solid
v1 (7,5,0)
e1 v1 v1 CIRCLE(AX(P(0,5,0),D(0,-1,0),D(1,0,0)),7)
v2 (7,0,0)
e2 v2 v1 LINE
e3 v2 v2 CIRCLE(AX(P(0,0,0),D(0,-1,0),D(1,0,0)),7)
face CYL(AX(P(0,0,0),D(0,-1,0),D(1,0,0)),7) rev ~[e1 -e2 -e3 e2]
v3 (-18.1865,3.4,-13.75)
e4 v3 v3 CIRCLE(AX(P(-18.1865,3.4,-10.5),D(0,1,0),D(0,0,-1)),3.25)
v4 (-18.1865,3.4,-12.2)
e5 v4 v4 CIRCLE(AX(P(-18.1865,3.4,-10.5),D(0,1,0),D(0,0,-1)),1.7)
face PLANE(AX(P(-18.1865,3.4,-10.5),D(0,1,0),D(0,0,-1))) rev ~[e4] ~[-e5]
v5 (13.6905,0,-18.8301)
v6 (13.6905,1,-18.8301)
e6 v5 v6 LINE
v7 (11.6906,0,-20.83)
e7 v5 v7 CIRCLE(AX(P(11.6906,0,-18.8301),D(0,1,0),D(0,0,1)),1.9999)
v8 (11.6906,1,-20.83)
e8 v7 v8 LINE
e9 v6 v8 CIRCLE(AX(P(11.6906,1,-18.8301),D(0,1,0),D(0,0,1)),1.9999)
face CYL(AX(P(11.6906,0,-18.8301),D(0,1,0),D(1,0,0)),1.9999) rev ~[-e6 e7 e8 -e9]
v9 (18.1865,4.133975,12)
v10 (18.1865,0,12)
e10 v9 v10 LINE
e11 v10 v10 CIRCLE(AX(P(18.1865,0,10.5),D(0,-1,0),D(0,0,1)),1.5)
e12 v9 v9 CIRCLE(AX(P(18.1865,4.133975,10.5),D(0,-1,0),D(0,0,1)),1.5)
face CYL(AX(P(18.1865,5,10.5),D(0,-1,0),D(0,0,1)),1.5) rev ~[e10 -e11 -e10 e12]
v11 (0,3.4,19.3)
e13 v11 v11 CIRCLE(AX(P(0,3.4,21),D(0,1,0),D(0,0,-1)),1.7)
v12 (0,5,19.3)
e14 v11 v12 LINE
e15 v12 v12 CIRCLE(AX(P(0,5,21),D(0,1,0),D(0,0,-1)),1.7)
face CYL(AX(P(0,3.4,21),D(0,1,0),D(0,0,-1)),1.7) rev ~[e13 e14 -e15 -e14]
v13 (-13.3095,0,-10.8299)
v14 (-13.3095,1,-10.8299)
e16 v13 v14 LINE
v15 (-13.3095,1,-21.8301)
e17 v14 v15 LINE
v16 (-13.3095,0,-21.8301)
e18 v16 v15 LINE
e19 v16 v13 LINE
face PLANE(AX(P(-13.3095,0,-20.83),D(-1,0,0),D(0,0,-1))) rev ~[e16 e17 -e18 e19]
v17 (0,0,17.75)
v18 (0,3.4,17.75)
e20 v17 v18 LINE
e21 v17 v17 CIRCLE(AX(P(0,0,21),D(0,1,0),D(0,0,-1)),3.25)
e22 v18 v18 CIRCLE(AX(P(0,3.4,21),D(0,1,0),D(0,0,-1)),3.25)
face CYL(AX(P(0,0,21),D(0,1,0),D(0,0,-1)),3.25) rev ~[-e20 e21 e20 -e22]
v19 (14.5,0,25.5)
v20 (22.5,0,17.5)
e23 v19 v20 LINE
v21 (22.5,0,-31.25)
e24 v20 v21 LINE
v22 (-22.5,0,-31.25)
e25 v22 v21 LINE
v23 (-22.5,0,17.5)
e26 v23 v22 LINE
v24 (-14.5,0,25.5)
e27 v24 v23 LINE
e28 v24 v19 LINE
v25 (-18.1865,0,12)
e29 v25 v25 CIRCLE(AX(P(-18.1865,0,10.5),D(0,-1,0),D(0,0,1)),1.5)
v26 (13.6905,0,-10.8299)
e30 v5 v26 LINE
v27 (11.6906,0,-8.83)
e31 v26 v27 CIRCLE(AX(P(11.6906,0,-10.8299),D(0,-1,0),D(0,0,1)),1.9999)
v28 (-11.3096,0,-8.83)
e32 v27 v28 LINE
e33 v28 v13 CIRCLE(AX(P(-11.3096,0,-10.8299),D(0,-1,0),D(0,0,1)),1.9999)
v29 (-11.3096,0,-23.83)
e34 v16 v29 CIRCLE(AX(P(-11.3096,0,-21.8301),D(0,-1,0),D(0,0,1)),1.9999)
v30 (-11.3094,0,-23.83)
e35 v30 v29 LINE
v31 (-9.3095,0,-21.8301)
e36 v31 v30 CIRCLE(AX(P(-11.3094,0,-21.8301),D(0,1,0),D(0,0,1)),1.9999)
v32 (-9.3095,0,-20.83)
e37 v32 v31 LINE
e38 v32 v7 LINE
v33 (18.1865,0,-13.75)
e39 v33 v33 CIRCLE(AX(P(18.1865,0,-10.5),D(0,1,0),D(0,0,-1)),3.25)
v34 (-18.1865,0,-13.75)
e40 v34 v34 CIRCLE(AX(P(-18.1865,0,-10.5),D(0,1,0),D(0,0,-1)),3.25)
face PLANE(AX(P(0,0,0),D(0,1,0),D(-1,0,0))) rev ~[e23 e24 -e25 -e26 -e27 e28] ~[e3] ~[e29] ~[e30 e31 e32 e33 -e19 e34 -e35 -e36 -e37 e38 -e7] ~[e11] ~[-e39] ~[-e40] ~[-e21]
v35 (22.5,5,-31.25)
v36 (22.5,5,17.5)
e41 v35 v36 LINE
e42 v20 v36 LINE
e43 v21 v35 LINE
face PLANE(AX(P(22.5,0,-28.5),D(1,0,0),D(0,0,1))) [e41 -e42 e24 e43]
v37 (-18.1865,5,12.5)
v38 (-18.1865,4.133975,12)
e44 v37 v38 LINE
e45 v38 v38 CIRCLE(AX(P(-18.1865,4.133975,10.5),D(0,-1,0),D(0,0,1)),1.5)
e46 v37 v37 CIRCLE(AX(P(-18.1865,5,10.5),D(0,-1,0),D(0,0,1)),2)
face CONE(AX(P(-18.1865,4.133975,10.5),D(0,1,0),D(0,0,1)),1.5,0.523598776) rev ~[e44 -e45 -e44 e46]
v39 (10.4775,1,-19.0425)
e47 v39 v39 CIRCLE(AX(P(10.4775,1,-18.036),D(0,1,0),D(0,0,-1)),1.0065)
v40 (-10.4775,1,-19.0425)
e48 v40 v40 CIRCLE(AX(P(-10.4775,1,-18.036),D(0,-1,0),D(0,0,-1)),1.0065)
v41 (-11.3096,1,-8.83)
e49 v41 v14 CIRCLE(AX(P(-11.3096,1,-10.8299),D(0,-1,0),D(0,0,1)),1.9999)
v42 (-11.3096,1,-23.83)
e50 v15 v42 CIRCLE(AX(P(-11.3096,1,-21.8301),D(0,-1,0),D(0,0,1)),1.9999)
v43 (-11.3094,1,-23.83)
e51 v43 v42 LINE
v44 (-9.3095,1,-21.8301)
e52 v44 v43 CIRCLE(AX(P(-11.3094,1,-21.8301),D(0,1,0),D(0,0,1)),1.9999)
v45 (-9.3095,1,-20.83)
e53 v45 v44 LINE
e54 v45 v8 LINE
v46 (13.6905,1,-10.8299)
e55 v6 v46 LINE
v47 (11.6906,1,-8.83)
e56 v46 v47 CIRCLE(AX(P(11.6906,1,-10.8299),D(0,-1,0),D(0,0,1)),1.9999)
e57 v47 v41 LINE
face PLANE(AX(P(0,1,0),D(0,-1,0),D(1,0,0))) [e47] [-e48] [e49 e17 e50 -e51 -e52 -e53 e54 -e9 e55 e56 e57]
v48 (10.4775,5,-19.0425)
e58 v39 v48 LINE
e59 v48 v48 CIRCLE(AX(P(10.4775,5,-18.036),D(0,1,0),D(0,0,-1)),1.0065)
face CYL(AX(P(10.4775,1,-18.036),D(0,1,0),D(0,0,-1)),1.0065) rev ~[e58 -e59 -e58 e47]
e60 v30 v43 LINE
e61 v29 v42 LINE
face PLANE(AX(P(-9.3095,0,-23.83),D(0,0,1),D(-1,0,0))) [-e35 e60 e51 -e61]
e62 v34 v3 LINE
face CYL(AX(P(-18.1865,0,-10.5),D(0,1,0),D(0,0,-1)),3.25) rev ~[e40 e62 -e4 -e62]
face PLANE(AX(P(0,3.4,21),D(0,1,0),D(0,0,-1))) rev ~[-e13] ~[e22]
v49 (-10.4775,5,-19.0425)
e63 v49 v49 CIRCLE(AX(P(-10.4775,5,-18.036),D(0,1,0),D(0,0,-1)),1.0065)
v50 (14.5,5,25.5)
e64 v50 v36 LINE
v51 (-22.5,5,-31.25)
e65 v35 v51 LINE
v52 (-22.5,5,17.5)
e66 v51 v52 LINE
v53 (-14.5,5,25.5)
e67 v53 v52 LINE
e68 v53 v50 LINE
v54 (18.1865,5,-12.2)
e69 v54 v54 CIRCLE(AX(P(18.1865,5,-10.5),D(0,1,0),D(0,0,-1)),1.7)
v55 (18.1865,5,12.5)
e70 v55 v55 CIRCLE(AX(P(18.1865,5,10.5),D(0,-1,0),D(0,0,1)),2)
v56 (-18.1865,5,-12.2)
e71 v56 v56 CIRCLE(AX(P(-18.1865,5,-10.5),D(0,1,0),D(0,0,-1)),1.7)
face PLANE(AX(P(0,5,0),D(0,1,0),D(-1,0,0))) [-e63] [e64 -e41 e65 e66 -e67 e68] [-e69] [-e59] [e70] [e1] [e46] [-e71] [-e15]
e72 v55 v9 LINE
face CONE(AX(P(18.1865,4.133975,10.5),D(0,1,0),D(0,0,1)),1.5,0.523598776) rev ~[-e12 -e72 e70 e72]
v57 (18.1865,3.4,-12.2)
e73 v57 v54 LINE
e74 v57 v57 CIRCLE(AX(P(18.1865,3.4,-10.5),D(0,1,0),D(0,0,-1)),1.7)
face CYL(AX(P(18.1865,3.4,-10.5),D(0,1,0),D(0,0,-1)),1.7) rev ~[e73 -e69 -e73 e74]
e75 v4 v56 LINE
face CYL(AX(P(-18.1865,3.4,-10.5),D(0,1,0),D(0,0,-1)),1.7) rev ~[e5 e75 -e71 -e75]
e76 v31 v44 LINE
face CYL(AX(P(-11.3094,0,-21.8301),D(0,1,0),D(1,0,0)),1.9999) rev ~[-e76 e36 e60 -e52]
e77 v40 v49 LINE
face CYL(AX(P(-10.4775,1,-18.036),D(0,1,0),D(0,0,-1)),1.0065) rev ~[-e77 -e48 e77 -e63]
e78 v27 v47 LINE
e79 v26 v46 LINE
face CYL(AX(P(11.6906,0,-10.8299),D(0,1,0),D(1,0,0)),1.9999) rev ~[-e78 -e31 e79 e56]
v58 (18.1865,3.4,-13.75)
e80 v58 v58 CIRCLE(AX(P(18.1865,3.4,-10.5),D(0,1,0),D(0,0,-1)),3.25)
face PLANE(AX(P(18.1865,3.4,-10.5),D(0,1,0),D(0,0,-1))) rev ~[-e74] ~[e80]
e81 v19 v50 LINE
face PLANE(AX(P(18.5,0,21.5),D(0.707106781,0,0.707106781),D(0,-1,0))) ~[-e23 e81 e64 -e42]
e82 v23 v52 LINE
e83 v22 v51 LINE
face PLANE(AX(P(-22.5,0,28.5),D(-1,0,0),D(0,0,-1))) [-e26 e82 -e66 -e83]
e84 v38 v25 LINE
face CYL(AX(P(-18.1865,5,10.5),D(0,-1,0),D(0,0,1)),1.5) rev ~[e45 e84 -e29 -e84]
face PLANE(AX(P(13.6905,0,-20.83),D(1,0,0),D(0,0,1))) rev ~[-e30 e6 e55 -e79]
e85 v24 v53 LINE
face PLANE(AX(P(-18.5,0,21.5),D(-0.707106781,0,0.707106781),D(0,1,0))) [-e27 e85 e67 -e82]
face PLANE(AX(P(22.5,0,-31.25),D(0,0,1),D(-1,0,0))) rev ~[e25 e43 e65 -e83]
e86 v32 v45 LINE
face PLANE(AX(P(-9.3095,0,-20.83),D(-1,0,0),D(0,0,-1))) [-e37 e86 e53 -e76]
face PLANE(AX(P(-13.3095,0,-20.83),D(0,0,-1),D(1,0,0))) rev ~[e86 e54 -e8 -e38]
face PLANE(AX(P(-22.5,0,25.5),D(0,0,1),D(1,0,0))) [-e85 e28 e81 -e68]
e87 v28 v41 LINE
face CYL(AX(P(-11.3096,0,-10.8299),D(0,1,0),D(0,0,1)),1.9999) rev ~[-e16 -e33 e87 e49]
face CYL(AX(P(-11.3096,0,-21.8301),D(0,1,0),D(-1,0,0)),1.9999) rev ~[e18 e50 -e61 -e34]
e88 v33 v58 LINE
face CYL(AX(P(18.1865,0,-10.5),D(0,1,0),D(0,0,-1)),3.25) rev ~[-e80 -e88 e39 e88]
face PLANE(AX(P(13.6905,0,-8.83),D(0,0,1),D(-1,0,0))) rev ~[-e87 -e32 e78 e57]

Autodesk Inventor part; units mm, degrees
ref_plane "YZ Plane" through (0, 0, 0) normal (1, 0, 0) x (0, 1, 0)
ref_plane "XZ Plane" through (0, 0, 0) normal (0, 1, 0) x (-1, 0, 0)
ref_plane "XY Plane" through (0, 0, 0) normal (0, 0, 1) x (1, 0, 0)
sketch "Sketch1" plane through (0, 0, 0) normal (0, 1, 0) x (-1, 0, 0)
  line L0 (-22.5, 28.5) -> (22.5, 28.5)
  line L1 (22.5, 28.5) -> (22.5, -28.5)
  line L2 (22.5, -28.5) -> (-22.5, -28.5)
  line L3 (-22.5, -28.5) -> (-22.5, 28.5)
  line L4 (-22.5, 28.5) -> (22.5, -28.5) construction
  line L5 (22.5, 28.5) -> (-22.5, -28.5) construction
  circle A0 centre (0, 0) radius 21 construction
  line L6 (0, -43.2) -> (0, 40.45) projected
  line L7 (22.5, -28.5) -> (-22.5, -28.5)
  line L8 (-22.5, -28.5) -> (-22.5, -31.25)
  line L9 (-22.5, -31.25) -> (22.5, -31.25)
  line L10 (22.5, -31.25) -> (22.5, -28.5)
  point P0 (0, 21)
  point P1 (-18.1865, -10.5)
  point P2 (18.1865, -10.5)
  dimension "d2" = 42
  dimension "d0" = 45
  dimension "d1" = 57
  dimension "d5" = 360
  dimension "d62" = 2.75
extrude "Extrusion1" add sketch "Sketch1" along normal blind 5
hole "Hole1" at (0, 0, 21) at (18.1865, 0, -10.5) at (-18.1865, 0, -10.5) direction (0, 1, 0) diameter 3.4 depth 8.8 tip angle 118 counterbore diameter 6.5 counterbore depth 3.4 clearance for "Socket Head Cap Screw ISO 4762" size "M3" standard "ISO"
sketch "Sketch2" plane through (0, 0, 0) normal (0, -1, 0) x (1, 0, 0)
  circle A0 centre (0, 0) radius 7
  dimension "d16" = 14
extrude "Extrusion2" cut sketch "Sketch2" against normal through all
sketch "Sketch3" plane through (0, 5, 0) normal (0, 1, 0) x (1, 0, 0)
  circle A0 centre (0, 0) radius 21 construction
  point P0 (18.1865, -10.5)
  point P1 (0, 21)
  point P2 (-18.1865, -10.5)
  dimension "d19" = 42
  dimension "d22" = 360
hole "Hole2" at (18.1865, 5, 10.5) at (-18.1865, 5, 10.5) direction (0, -1, 0) diameter 3 depth 8.8 tip angle 118
chamfer "Chamfer1" distance 0.5 angle 60 2 edges at (-18.1865, 5, 9) (18.1865, 5, 9) measured on face at (-0.2813, 5, -23.1497)
sketch "Sketch5" plane through (0, 0, 0) normal (0, -1, 0) x (1, 0, 0)
  line L0 (-13.3095, -20.83) -> (13.6905, -20.83)
  line L1 (13.6905, -20.83) -> (13.6905, -8.83)
  line L2 (13.6905, -8.83) -> (-13.3095, -8.83)
  line L3 (-13.3095, -8.83) -> (-13.3095, -20.83)
  line L4 (-13.3095, -20.83) -> (13.6905, -8.83) construction
  line L5 (13.6905, -20.83) -> (-13.3095, -8.83) construction
  line L6 (0, -36.4441) -> (0, 10.0043) construction
  circle A0 centre (0, 0) radius 7 projected
  point P0 (0.1905, -14.83)
  point P1 (3.4689, -6.08)
  point P2 (-3.4689, -6.08)
  dimension "d34" = 12
  dimension "d35" = 27
  dimension "d36" = 13.3095
  dimension "d38" = 20.83
extrude "Extrusion3" cut sketch "Sketch5" against normal blind 1 contours L3 L2 L1 L0
sketch "Sketch6" plane through (0, 1, 0) normal (0, -1, 0) x (1, 0, 0)
  circle A0 centre (-10.4775, -18.036) radius 1.1414 construction
  line L0 (-13.3095, -20.83) -> (-13.3095, -8.83) projected
  line L1 (13.6905, -20.83) -> (-13.3095, -20.83) projected
  circle A1 centre (10.4775, -18.036) radius 1.164 construction
  line L2 (-10.4775, -18.036) -> (12.0154, -18.036) construction
  point P0 (0, 0)
  dimension "d41" = 2.832
  dimension "d42" = 2.794
  dimension "d43" = 20.955
hole "Hole3" at (10.4775, 1, -18.036) at (-10.4775, 1, -18.036) direction (0, 1, 0) diameter 2.013 depth 7.6 tip angle 118 thread size "M2.5x0.45" class "6H" standard "ISO Metric profile"
sketch "Sketch7" plane through (0, 0, 0) normal (0, -1, 0) x (1, 0, 0)
  line L0 (13.6905, -20.83) -> (-13.3095, -20.83) projected
  circle A0 centre (-11.3095, -20.83) radius 2
  line L1 (-13.3095, -20.83) -> (-13.3095, -8.83) projected
  line L2 (-9.3095, -20.83) -> (-9.3095, -23.83)
  line L3 (-13.3095, -20.83) -> (-13.3095, -23.83)
  line L4 (-9.3095, -23.83) -> (-13.3095, -23.83)
  line L5 (22.5, -31.25) -> (-22.5, -31.25) projected
  point P0 (0, 0)
  point P1 (-9.3095, -18.08)
  point P2 (-13.3095, -20.83)
  dimension "d51" = 4
  dimension "d63" = 3
extrude "Extrusion4" cut sketch "Sketch7" against normal blind 1
sketch "Sketch8" plane through (-22.5, 0, 28.5) normal (0, 0, 1) x (1, 0, 0)
  line L0 (25.75, 3.4) -> (19.25, 3.4) projected
  line L1 (0, 0) -> (45, 0) projected
  line L2 (45, 0) -> (45, 5) projected
  line L3 (0, 5) -> (45, 5) projected
  line L4 (0, 0) -> (0, 5) projected
  point P0 (22.5, 0)
extrude "Extrusion5" cut sketch "Sketch8" against normal blind 3
fillet "Fillet1" radius 2 5 edges at (13.6905, 0.5, -20.83) (13.6905, 0.5, -8.83) (-13.3095, 0.5, -8.83) (-9.3095, 0.5, -23.83) (-13.3095, 0.5, -23.83)
sketch "Sketch11" plane through (0, 5, 0) normal (0, 1, 0) x (1, 0, 0)
  point P0 (0, 0)
chamfer "Chamfer3" distance 8 angle 45 2 edges at (22.5, 2.5, 25.5) (-22.5, 2.5, 25.5)
properties part number "encoder mount"
